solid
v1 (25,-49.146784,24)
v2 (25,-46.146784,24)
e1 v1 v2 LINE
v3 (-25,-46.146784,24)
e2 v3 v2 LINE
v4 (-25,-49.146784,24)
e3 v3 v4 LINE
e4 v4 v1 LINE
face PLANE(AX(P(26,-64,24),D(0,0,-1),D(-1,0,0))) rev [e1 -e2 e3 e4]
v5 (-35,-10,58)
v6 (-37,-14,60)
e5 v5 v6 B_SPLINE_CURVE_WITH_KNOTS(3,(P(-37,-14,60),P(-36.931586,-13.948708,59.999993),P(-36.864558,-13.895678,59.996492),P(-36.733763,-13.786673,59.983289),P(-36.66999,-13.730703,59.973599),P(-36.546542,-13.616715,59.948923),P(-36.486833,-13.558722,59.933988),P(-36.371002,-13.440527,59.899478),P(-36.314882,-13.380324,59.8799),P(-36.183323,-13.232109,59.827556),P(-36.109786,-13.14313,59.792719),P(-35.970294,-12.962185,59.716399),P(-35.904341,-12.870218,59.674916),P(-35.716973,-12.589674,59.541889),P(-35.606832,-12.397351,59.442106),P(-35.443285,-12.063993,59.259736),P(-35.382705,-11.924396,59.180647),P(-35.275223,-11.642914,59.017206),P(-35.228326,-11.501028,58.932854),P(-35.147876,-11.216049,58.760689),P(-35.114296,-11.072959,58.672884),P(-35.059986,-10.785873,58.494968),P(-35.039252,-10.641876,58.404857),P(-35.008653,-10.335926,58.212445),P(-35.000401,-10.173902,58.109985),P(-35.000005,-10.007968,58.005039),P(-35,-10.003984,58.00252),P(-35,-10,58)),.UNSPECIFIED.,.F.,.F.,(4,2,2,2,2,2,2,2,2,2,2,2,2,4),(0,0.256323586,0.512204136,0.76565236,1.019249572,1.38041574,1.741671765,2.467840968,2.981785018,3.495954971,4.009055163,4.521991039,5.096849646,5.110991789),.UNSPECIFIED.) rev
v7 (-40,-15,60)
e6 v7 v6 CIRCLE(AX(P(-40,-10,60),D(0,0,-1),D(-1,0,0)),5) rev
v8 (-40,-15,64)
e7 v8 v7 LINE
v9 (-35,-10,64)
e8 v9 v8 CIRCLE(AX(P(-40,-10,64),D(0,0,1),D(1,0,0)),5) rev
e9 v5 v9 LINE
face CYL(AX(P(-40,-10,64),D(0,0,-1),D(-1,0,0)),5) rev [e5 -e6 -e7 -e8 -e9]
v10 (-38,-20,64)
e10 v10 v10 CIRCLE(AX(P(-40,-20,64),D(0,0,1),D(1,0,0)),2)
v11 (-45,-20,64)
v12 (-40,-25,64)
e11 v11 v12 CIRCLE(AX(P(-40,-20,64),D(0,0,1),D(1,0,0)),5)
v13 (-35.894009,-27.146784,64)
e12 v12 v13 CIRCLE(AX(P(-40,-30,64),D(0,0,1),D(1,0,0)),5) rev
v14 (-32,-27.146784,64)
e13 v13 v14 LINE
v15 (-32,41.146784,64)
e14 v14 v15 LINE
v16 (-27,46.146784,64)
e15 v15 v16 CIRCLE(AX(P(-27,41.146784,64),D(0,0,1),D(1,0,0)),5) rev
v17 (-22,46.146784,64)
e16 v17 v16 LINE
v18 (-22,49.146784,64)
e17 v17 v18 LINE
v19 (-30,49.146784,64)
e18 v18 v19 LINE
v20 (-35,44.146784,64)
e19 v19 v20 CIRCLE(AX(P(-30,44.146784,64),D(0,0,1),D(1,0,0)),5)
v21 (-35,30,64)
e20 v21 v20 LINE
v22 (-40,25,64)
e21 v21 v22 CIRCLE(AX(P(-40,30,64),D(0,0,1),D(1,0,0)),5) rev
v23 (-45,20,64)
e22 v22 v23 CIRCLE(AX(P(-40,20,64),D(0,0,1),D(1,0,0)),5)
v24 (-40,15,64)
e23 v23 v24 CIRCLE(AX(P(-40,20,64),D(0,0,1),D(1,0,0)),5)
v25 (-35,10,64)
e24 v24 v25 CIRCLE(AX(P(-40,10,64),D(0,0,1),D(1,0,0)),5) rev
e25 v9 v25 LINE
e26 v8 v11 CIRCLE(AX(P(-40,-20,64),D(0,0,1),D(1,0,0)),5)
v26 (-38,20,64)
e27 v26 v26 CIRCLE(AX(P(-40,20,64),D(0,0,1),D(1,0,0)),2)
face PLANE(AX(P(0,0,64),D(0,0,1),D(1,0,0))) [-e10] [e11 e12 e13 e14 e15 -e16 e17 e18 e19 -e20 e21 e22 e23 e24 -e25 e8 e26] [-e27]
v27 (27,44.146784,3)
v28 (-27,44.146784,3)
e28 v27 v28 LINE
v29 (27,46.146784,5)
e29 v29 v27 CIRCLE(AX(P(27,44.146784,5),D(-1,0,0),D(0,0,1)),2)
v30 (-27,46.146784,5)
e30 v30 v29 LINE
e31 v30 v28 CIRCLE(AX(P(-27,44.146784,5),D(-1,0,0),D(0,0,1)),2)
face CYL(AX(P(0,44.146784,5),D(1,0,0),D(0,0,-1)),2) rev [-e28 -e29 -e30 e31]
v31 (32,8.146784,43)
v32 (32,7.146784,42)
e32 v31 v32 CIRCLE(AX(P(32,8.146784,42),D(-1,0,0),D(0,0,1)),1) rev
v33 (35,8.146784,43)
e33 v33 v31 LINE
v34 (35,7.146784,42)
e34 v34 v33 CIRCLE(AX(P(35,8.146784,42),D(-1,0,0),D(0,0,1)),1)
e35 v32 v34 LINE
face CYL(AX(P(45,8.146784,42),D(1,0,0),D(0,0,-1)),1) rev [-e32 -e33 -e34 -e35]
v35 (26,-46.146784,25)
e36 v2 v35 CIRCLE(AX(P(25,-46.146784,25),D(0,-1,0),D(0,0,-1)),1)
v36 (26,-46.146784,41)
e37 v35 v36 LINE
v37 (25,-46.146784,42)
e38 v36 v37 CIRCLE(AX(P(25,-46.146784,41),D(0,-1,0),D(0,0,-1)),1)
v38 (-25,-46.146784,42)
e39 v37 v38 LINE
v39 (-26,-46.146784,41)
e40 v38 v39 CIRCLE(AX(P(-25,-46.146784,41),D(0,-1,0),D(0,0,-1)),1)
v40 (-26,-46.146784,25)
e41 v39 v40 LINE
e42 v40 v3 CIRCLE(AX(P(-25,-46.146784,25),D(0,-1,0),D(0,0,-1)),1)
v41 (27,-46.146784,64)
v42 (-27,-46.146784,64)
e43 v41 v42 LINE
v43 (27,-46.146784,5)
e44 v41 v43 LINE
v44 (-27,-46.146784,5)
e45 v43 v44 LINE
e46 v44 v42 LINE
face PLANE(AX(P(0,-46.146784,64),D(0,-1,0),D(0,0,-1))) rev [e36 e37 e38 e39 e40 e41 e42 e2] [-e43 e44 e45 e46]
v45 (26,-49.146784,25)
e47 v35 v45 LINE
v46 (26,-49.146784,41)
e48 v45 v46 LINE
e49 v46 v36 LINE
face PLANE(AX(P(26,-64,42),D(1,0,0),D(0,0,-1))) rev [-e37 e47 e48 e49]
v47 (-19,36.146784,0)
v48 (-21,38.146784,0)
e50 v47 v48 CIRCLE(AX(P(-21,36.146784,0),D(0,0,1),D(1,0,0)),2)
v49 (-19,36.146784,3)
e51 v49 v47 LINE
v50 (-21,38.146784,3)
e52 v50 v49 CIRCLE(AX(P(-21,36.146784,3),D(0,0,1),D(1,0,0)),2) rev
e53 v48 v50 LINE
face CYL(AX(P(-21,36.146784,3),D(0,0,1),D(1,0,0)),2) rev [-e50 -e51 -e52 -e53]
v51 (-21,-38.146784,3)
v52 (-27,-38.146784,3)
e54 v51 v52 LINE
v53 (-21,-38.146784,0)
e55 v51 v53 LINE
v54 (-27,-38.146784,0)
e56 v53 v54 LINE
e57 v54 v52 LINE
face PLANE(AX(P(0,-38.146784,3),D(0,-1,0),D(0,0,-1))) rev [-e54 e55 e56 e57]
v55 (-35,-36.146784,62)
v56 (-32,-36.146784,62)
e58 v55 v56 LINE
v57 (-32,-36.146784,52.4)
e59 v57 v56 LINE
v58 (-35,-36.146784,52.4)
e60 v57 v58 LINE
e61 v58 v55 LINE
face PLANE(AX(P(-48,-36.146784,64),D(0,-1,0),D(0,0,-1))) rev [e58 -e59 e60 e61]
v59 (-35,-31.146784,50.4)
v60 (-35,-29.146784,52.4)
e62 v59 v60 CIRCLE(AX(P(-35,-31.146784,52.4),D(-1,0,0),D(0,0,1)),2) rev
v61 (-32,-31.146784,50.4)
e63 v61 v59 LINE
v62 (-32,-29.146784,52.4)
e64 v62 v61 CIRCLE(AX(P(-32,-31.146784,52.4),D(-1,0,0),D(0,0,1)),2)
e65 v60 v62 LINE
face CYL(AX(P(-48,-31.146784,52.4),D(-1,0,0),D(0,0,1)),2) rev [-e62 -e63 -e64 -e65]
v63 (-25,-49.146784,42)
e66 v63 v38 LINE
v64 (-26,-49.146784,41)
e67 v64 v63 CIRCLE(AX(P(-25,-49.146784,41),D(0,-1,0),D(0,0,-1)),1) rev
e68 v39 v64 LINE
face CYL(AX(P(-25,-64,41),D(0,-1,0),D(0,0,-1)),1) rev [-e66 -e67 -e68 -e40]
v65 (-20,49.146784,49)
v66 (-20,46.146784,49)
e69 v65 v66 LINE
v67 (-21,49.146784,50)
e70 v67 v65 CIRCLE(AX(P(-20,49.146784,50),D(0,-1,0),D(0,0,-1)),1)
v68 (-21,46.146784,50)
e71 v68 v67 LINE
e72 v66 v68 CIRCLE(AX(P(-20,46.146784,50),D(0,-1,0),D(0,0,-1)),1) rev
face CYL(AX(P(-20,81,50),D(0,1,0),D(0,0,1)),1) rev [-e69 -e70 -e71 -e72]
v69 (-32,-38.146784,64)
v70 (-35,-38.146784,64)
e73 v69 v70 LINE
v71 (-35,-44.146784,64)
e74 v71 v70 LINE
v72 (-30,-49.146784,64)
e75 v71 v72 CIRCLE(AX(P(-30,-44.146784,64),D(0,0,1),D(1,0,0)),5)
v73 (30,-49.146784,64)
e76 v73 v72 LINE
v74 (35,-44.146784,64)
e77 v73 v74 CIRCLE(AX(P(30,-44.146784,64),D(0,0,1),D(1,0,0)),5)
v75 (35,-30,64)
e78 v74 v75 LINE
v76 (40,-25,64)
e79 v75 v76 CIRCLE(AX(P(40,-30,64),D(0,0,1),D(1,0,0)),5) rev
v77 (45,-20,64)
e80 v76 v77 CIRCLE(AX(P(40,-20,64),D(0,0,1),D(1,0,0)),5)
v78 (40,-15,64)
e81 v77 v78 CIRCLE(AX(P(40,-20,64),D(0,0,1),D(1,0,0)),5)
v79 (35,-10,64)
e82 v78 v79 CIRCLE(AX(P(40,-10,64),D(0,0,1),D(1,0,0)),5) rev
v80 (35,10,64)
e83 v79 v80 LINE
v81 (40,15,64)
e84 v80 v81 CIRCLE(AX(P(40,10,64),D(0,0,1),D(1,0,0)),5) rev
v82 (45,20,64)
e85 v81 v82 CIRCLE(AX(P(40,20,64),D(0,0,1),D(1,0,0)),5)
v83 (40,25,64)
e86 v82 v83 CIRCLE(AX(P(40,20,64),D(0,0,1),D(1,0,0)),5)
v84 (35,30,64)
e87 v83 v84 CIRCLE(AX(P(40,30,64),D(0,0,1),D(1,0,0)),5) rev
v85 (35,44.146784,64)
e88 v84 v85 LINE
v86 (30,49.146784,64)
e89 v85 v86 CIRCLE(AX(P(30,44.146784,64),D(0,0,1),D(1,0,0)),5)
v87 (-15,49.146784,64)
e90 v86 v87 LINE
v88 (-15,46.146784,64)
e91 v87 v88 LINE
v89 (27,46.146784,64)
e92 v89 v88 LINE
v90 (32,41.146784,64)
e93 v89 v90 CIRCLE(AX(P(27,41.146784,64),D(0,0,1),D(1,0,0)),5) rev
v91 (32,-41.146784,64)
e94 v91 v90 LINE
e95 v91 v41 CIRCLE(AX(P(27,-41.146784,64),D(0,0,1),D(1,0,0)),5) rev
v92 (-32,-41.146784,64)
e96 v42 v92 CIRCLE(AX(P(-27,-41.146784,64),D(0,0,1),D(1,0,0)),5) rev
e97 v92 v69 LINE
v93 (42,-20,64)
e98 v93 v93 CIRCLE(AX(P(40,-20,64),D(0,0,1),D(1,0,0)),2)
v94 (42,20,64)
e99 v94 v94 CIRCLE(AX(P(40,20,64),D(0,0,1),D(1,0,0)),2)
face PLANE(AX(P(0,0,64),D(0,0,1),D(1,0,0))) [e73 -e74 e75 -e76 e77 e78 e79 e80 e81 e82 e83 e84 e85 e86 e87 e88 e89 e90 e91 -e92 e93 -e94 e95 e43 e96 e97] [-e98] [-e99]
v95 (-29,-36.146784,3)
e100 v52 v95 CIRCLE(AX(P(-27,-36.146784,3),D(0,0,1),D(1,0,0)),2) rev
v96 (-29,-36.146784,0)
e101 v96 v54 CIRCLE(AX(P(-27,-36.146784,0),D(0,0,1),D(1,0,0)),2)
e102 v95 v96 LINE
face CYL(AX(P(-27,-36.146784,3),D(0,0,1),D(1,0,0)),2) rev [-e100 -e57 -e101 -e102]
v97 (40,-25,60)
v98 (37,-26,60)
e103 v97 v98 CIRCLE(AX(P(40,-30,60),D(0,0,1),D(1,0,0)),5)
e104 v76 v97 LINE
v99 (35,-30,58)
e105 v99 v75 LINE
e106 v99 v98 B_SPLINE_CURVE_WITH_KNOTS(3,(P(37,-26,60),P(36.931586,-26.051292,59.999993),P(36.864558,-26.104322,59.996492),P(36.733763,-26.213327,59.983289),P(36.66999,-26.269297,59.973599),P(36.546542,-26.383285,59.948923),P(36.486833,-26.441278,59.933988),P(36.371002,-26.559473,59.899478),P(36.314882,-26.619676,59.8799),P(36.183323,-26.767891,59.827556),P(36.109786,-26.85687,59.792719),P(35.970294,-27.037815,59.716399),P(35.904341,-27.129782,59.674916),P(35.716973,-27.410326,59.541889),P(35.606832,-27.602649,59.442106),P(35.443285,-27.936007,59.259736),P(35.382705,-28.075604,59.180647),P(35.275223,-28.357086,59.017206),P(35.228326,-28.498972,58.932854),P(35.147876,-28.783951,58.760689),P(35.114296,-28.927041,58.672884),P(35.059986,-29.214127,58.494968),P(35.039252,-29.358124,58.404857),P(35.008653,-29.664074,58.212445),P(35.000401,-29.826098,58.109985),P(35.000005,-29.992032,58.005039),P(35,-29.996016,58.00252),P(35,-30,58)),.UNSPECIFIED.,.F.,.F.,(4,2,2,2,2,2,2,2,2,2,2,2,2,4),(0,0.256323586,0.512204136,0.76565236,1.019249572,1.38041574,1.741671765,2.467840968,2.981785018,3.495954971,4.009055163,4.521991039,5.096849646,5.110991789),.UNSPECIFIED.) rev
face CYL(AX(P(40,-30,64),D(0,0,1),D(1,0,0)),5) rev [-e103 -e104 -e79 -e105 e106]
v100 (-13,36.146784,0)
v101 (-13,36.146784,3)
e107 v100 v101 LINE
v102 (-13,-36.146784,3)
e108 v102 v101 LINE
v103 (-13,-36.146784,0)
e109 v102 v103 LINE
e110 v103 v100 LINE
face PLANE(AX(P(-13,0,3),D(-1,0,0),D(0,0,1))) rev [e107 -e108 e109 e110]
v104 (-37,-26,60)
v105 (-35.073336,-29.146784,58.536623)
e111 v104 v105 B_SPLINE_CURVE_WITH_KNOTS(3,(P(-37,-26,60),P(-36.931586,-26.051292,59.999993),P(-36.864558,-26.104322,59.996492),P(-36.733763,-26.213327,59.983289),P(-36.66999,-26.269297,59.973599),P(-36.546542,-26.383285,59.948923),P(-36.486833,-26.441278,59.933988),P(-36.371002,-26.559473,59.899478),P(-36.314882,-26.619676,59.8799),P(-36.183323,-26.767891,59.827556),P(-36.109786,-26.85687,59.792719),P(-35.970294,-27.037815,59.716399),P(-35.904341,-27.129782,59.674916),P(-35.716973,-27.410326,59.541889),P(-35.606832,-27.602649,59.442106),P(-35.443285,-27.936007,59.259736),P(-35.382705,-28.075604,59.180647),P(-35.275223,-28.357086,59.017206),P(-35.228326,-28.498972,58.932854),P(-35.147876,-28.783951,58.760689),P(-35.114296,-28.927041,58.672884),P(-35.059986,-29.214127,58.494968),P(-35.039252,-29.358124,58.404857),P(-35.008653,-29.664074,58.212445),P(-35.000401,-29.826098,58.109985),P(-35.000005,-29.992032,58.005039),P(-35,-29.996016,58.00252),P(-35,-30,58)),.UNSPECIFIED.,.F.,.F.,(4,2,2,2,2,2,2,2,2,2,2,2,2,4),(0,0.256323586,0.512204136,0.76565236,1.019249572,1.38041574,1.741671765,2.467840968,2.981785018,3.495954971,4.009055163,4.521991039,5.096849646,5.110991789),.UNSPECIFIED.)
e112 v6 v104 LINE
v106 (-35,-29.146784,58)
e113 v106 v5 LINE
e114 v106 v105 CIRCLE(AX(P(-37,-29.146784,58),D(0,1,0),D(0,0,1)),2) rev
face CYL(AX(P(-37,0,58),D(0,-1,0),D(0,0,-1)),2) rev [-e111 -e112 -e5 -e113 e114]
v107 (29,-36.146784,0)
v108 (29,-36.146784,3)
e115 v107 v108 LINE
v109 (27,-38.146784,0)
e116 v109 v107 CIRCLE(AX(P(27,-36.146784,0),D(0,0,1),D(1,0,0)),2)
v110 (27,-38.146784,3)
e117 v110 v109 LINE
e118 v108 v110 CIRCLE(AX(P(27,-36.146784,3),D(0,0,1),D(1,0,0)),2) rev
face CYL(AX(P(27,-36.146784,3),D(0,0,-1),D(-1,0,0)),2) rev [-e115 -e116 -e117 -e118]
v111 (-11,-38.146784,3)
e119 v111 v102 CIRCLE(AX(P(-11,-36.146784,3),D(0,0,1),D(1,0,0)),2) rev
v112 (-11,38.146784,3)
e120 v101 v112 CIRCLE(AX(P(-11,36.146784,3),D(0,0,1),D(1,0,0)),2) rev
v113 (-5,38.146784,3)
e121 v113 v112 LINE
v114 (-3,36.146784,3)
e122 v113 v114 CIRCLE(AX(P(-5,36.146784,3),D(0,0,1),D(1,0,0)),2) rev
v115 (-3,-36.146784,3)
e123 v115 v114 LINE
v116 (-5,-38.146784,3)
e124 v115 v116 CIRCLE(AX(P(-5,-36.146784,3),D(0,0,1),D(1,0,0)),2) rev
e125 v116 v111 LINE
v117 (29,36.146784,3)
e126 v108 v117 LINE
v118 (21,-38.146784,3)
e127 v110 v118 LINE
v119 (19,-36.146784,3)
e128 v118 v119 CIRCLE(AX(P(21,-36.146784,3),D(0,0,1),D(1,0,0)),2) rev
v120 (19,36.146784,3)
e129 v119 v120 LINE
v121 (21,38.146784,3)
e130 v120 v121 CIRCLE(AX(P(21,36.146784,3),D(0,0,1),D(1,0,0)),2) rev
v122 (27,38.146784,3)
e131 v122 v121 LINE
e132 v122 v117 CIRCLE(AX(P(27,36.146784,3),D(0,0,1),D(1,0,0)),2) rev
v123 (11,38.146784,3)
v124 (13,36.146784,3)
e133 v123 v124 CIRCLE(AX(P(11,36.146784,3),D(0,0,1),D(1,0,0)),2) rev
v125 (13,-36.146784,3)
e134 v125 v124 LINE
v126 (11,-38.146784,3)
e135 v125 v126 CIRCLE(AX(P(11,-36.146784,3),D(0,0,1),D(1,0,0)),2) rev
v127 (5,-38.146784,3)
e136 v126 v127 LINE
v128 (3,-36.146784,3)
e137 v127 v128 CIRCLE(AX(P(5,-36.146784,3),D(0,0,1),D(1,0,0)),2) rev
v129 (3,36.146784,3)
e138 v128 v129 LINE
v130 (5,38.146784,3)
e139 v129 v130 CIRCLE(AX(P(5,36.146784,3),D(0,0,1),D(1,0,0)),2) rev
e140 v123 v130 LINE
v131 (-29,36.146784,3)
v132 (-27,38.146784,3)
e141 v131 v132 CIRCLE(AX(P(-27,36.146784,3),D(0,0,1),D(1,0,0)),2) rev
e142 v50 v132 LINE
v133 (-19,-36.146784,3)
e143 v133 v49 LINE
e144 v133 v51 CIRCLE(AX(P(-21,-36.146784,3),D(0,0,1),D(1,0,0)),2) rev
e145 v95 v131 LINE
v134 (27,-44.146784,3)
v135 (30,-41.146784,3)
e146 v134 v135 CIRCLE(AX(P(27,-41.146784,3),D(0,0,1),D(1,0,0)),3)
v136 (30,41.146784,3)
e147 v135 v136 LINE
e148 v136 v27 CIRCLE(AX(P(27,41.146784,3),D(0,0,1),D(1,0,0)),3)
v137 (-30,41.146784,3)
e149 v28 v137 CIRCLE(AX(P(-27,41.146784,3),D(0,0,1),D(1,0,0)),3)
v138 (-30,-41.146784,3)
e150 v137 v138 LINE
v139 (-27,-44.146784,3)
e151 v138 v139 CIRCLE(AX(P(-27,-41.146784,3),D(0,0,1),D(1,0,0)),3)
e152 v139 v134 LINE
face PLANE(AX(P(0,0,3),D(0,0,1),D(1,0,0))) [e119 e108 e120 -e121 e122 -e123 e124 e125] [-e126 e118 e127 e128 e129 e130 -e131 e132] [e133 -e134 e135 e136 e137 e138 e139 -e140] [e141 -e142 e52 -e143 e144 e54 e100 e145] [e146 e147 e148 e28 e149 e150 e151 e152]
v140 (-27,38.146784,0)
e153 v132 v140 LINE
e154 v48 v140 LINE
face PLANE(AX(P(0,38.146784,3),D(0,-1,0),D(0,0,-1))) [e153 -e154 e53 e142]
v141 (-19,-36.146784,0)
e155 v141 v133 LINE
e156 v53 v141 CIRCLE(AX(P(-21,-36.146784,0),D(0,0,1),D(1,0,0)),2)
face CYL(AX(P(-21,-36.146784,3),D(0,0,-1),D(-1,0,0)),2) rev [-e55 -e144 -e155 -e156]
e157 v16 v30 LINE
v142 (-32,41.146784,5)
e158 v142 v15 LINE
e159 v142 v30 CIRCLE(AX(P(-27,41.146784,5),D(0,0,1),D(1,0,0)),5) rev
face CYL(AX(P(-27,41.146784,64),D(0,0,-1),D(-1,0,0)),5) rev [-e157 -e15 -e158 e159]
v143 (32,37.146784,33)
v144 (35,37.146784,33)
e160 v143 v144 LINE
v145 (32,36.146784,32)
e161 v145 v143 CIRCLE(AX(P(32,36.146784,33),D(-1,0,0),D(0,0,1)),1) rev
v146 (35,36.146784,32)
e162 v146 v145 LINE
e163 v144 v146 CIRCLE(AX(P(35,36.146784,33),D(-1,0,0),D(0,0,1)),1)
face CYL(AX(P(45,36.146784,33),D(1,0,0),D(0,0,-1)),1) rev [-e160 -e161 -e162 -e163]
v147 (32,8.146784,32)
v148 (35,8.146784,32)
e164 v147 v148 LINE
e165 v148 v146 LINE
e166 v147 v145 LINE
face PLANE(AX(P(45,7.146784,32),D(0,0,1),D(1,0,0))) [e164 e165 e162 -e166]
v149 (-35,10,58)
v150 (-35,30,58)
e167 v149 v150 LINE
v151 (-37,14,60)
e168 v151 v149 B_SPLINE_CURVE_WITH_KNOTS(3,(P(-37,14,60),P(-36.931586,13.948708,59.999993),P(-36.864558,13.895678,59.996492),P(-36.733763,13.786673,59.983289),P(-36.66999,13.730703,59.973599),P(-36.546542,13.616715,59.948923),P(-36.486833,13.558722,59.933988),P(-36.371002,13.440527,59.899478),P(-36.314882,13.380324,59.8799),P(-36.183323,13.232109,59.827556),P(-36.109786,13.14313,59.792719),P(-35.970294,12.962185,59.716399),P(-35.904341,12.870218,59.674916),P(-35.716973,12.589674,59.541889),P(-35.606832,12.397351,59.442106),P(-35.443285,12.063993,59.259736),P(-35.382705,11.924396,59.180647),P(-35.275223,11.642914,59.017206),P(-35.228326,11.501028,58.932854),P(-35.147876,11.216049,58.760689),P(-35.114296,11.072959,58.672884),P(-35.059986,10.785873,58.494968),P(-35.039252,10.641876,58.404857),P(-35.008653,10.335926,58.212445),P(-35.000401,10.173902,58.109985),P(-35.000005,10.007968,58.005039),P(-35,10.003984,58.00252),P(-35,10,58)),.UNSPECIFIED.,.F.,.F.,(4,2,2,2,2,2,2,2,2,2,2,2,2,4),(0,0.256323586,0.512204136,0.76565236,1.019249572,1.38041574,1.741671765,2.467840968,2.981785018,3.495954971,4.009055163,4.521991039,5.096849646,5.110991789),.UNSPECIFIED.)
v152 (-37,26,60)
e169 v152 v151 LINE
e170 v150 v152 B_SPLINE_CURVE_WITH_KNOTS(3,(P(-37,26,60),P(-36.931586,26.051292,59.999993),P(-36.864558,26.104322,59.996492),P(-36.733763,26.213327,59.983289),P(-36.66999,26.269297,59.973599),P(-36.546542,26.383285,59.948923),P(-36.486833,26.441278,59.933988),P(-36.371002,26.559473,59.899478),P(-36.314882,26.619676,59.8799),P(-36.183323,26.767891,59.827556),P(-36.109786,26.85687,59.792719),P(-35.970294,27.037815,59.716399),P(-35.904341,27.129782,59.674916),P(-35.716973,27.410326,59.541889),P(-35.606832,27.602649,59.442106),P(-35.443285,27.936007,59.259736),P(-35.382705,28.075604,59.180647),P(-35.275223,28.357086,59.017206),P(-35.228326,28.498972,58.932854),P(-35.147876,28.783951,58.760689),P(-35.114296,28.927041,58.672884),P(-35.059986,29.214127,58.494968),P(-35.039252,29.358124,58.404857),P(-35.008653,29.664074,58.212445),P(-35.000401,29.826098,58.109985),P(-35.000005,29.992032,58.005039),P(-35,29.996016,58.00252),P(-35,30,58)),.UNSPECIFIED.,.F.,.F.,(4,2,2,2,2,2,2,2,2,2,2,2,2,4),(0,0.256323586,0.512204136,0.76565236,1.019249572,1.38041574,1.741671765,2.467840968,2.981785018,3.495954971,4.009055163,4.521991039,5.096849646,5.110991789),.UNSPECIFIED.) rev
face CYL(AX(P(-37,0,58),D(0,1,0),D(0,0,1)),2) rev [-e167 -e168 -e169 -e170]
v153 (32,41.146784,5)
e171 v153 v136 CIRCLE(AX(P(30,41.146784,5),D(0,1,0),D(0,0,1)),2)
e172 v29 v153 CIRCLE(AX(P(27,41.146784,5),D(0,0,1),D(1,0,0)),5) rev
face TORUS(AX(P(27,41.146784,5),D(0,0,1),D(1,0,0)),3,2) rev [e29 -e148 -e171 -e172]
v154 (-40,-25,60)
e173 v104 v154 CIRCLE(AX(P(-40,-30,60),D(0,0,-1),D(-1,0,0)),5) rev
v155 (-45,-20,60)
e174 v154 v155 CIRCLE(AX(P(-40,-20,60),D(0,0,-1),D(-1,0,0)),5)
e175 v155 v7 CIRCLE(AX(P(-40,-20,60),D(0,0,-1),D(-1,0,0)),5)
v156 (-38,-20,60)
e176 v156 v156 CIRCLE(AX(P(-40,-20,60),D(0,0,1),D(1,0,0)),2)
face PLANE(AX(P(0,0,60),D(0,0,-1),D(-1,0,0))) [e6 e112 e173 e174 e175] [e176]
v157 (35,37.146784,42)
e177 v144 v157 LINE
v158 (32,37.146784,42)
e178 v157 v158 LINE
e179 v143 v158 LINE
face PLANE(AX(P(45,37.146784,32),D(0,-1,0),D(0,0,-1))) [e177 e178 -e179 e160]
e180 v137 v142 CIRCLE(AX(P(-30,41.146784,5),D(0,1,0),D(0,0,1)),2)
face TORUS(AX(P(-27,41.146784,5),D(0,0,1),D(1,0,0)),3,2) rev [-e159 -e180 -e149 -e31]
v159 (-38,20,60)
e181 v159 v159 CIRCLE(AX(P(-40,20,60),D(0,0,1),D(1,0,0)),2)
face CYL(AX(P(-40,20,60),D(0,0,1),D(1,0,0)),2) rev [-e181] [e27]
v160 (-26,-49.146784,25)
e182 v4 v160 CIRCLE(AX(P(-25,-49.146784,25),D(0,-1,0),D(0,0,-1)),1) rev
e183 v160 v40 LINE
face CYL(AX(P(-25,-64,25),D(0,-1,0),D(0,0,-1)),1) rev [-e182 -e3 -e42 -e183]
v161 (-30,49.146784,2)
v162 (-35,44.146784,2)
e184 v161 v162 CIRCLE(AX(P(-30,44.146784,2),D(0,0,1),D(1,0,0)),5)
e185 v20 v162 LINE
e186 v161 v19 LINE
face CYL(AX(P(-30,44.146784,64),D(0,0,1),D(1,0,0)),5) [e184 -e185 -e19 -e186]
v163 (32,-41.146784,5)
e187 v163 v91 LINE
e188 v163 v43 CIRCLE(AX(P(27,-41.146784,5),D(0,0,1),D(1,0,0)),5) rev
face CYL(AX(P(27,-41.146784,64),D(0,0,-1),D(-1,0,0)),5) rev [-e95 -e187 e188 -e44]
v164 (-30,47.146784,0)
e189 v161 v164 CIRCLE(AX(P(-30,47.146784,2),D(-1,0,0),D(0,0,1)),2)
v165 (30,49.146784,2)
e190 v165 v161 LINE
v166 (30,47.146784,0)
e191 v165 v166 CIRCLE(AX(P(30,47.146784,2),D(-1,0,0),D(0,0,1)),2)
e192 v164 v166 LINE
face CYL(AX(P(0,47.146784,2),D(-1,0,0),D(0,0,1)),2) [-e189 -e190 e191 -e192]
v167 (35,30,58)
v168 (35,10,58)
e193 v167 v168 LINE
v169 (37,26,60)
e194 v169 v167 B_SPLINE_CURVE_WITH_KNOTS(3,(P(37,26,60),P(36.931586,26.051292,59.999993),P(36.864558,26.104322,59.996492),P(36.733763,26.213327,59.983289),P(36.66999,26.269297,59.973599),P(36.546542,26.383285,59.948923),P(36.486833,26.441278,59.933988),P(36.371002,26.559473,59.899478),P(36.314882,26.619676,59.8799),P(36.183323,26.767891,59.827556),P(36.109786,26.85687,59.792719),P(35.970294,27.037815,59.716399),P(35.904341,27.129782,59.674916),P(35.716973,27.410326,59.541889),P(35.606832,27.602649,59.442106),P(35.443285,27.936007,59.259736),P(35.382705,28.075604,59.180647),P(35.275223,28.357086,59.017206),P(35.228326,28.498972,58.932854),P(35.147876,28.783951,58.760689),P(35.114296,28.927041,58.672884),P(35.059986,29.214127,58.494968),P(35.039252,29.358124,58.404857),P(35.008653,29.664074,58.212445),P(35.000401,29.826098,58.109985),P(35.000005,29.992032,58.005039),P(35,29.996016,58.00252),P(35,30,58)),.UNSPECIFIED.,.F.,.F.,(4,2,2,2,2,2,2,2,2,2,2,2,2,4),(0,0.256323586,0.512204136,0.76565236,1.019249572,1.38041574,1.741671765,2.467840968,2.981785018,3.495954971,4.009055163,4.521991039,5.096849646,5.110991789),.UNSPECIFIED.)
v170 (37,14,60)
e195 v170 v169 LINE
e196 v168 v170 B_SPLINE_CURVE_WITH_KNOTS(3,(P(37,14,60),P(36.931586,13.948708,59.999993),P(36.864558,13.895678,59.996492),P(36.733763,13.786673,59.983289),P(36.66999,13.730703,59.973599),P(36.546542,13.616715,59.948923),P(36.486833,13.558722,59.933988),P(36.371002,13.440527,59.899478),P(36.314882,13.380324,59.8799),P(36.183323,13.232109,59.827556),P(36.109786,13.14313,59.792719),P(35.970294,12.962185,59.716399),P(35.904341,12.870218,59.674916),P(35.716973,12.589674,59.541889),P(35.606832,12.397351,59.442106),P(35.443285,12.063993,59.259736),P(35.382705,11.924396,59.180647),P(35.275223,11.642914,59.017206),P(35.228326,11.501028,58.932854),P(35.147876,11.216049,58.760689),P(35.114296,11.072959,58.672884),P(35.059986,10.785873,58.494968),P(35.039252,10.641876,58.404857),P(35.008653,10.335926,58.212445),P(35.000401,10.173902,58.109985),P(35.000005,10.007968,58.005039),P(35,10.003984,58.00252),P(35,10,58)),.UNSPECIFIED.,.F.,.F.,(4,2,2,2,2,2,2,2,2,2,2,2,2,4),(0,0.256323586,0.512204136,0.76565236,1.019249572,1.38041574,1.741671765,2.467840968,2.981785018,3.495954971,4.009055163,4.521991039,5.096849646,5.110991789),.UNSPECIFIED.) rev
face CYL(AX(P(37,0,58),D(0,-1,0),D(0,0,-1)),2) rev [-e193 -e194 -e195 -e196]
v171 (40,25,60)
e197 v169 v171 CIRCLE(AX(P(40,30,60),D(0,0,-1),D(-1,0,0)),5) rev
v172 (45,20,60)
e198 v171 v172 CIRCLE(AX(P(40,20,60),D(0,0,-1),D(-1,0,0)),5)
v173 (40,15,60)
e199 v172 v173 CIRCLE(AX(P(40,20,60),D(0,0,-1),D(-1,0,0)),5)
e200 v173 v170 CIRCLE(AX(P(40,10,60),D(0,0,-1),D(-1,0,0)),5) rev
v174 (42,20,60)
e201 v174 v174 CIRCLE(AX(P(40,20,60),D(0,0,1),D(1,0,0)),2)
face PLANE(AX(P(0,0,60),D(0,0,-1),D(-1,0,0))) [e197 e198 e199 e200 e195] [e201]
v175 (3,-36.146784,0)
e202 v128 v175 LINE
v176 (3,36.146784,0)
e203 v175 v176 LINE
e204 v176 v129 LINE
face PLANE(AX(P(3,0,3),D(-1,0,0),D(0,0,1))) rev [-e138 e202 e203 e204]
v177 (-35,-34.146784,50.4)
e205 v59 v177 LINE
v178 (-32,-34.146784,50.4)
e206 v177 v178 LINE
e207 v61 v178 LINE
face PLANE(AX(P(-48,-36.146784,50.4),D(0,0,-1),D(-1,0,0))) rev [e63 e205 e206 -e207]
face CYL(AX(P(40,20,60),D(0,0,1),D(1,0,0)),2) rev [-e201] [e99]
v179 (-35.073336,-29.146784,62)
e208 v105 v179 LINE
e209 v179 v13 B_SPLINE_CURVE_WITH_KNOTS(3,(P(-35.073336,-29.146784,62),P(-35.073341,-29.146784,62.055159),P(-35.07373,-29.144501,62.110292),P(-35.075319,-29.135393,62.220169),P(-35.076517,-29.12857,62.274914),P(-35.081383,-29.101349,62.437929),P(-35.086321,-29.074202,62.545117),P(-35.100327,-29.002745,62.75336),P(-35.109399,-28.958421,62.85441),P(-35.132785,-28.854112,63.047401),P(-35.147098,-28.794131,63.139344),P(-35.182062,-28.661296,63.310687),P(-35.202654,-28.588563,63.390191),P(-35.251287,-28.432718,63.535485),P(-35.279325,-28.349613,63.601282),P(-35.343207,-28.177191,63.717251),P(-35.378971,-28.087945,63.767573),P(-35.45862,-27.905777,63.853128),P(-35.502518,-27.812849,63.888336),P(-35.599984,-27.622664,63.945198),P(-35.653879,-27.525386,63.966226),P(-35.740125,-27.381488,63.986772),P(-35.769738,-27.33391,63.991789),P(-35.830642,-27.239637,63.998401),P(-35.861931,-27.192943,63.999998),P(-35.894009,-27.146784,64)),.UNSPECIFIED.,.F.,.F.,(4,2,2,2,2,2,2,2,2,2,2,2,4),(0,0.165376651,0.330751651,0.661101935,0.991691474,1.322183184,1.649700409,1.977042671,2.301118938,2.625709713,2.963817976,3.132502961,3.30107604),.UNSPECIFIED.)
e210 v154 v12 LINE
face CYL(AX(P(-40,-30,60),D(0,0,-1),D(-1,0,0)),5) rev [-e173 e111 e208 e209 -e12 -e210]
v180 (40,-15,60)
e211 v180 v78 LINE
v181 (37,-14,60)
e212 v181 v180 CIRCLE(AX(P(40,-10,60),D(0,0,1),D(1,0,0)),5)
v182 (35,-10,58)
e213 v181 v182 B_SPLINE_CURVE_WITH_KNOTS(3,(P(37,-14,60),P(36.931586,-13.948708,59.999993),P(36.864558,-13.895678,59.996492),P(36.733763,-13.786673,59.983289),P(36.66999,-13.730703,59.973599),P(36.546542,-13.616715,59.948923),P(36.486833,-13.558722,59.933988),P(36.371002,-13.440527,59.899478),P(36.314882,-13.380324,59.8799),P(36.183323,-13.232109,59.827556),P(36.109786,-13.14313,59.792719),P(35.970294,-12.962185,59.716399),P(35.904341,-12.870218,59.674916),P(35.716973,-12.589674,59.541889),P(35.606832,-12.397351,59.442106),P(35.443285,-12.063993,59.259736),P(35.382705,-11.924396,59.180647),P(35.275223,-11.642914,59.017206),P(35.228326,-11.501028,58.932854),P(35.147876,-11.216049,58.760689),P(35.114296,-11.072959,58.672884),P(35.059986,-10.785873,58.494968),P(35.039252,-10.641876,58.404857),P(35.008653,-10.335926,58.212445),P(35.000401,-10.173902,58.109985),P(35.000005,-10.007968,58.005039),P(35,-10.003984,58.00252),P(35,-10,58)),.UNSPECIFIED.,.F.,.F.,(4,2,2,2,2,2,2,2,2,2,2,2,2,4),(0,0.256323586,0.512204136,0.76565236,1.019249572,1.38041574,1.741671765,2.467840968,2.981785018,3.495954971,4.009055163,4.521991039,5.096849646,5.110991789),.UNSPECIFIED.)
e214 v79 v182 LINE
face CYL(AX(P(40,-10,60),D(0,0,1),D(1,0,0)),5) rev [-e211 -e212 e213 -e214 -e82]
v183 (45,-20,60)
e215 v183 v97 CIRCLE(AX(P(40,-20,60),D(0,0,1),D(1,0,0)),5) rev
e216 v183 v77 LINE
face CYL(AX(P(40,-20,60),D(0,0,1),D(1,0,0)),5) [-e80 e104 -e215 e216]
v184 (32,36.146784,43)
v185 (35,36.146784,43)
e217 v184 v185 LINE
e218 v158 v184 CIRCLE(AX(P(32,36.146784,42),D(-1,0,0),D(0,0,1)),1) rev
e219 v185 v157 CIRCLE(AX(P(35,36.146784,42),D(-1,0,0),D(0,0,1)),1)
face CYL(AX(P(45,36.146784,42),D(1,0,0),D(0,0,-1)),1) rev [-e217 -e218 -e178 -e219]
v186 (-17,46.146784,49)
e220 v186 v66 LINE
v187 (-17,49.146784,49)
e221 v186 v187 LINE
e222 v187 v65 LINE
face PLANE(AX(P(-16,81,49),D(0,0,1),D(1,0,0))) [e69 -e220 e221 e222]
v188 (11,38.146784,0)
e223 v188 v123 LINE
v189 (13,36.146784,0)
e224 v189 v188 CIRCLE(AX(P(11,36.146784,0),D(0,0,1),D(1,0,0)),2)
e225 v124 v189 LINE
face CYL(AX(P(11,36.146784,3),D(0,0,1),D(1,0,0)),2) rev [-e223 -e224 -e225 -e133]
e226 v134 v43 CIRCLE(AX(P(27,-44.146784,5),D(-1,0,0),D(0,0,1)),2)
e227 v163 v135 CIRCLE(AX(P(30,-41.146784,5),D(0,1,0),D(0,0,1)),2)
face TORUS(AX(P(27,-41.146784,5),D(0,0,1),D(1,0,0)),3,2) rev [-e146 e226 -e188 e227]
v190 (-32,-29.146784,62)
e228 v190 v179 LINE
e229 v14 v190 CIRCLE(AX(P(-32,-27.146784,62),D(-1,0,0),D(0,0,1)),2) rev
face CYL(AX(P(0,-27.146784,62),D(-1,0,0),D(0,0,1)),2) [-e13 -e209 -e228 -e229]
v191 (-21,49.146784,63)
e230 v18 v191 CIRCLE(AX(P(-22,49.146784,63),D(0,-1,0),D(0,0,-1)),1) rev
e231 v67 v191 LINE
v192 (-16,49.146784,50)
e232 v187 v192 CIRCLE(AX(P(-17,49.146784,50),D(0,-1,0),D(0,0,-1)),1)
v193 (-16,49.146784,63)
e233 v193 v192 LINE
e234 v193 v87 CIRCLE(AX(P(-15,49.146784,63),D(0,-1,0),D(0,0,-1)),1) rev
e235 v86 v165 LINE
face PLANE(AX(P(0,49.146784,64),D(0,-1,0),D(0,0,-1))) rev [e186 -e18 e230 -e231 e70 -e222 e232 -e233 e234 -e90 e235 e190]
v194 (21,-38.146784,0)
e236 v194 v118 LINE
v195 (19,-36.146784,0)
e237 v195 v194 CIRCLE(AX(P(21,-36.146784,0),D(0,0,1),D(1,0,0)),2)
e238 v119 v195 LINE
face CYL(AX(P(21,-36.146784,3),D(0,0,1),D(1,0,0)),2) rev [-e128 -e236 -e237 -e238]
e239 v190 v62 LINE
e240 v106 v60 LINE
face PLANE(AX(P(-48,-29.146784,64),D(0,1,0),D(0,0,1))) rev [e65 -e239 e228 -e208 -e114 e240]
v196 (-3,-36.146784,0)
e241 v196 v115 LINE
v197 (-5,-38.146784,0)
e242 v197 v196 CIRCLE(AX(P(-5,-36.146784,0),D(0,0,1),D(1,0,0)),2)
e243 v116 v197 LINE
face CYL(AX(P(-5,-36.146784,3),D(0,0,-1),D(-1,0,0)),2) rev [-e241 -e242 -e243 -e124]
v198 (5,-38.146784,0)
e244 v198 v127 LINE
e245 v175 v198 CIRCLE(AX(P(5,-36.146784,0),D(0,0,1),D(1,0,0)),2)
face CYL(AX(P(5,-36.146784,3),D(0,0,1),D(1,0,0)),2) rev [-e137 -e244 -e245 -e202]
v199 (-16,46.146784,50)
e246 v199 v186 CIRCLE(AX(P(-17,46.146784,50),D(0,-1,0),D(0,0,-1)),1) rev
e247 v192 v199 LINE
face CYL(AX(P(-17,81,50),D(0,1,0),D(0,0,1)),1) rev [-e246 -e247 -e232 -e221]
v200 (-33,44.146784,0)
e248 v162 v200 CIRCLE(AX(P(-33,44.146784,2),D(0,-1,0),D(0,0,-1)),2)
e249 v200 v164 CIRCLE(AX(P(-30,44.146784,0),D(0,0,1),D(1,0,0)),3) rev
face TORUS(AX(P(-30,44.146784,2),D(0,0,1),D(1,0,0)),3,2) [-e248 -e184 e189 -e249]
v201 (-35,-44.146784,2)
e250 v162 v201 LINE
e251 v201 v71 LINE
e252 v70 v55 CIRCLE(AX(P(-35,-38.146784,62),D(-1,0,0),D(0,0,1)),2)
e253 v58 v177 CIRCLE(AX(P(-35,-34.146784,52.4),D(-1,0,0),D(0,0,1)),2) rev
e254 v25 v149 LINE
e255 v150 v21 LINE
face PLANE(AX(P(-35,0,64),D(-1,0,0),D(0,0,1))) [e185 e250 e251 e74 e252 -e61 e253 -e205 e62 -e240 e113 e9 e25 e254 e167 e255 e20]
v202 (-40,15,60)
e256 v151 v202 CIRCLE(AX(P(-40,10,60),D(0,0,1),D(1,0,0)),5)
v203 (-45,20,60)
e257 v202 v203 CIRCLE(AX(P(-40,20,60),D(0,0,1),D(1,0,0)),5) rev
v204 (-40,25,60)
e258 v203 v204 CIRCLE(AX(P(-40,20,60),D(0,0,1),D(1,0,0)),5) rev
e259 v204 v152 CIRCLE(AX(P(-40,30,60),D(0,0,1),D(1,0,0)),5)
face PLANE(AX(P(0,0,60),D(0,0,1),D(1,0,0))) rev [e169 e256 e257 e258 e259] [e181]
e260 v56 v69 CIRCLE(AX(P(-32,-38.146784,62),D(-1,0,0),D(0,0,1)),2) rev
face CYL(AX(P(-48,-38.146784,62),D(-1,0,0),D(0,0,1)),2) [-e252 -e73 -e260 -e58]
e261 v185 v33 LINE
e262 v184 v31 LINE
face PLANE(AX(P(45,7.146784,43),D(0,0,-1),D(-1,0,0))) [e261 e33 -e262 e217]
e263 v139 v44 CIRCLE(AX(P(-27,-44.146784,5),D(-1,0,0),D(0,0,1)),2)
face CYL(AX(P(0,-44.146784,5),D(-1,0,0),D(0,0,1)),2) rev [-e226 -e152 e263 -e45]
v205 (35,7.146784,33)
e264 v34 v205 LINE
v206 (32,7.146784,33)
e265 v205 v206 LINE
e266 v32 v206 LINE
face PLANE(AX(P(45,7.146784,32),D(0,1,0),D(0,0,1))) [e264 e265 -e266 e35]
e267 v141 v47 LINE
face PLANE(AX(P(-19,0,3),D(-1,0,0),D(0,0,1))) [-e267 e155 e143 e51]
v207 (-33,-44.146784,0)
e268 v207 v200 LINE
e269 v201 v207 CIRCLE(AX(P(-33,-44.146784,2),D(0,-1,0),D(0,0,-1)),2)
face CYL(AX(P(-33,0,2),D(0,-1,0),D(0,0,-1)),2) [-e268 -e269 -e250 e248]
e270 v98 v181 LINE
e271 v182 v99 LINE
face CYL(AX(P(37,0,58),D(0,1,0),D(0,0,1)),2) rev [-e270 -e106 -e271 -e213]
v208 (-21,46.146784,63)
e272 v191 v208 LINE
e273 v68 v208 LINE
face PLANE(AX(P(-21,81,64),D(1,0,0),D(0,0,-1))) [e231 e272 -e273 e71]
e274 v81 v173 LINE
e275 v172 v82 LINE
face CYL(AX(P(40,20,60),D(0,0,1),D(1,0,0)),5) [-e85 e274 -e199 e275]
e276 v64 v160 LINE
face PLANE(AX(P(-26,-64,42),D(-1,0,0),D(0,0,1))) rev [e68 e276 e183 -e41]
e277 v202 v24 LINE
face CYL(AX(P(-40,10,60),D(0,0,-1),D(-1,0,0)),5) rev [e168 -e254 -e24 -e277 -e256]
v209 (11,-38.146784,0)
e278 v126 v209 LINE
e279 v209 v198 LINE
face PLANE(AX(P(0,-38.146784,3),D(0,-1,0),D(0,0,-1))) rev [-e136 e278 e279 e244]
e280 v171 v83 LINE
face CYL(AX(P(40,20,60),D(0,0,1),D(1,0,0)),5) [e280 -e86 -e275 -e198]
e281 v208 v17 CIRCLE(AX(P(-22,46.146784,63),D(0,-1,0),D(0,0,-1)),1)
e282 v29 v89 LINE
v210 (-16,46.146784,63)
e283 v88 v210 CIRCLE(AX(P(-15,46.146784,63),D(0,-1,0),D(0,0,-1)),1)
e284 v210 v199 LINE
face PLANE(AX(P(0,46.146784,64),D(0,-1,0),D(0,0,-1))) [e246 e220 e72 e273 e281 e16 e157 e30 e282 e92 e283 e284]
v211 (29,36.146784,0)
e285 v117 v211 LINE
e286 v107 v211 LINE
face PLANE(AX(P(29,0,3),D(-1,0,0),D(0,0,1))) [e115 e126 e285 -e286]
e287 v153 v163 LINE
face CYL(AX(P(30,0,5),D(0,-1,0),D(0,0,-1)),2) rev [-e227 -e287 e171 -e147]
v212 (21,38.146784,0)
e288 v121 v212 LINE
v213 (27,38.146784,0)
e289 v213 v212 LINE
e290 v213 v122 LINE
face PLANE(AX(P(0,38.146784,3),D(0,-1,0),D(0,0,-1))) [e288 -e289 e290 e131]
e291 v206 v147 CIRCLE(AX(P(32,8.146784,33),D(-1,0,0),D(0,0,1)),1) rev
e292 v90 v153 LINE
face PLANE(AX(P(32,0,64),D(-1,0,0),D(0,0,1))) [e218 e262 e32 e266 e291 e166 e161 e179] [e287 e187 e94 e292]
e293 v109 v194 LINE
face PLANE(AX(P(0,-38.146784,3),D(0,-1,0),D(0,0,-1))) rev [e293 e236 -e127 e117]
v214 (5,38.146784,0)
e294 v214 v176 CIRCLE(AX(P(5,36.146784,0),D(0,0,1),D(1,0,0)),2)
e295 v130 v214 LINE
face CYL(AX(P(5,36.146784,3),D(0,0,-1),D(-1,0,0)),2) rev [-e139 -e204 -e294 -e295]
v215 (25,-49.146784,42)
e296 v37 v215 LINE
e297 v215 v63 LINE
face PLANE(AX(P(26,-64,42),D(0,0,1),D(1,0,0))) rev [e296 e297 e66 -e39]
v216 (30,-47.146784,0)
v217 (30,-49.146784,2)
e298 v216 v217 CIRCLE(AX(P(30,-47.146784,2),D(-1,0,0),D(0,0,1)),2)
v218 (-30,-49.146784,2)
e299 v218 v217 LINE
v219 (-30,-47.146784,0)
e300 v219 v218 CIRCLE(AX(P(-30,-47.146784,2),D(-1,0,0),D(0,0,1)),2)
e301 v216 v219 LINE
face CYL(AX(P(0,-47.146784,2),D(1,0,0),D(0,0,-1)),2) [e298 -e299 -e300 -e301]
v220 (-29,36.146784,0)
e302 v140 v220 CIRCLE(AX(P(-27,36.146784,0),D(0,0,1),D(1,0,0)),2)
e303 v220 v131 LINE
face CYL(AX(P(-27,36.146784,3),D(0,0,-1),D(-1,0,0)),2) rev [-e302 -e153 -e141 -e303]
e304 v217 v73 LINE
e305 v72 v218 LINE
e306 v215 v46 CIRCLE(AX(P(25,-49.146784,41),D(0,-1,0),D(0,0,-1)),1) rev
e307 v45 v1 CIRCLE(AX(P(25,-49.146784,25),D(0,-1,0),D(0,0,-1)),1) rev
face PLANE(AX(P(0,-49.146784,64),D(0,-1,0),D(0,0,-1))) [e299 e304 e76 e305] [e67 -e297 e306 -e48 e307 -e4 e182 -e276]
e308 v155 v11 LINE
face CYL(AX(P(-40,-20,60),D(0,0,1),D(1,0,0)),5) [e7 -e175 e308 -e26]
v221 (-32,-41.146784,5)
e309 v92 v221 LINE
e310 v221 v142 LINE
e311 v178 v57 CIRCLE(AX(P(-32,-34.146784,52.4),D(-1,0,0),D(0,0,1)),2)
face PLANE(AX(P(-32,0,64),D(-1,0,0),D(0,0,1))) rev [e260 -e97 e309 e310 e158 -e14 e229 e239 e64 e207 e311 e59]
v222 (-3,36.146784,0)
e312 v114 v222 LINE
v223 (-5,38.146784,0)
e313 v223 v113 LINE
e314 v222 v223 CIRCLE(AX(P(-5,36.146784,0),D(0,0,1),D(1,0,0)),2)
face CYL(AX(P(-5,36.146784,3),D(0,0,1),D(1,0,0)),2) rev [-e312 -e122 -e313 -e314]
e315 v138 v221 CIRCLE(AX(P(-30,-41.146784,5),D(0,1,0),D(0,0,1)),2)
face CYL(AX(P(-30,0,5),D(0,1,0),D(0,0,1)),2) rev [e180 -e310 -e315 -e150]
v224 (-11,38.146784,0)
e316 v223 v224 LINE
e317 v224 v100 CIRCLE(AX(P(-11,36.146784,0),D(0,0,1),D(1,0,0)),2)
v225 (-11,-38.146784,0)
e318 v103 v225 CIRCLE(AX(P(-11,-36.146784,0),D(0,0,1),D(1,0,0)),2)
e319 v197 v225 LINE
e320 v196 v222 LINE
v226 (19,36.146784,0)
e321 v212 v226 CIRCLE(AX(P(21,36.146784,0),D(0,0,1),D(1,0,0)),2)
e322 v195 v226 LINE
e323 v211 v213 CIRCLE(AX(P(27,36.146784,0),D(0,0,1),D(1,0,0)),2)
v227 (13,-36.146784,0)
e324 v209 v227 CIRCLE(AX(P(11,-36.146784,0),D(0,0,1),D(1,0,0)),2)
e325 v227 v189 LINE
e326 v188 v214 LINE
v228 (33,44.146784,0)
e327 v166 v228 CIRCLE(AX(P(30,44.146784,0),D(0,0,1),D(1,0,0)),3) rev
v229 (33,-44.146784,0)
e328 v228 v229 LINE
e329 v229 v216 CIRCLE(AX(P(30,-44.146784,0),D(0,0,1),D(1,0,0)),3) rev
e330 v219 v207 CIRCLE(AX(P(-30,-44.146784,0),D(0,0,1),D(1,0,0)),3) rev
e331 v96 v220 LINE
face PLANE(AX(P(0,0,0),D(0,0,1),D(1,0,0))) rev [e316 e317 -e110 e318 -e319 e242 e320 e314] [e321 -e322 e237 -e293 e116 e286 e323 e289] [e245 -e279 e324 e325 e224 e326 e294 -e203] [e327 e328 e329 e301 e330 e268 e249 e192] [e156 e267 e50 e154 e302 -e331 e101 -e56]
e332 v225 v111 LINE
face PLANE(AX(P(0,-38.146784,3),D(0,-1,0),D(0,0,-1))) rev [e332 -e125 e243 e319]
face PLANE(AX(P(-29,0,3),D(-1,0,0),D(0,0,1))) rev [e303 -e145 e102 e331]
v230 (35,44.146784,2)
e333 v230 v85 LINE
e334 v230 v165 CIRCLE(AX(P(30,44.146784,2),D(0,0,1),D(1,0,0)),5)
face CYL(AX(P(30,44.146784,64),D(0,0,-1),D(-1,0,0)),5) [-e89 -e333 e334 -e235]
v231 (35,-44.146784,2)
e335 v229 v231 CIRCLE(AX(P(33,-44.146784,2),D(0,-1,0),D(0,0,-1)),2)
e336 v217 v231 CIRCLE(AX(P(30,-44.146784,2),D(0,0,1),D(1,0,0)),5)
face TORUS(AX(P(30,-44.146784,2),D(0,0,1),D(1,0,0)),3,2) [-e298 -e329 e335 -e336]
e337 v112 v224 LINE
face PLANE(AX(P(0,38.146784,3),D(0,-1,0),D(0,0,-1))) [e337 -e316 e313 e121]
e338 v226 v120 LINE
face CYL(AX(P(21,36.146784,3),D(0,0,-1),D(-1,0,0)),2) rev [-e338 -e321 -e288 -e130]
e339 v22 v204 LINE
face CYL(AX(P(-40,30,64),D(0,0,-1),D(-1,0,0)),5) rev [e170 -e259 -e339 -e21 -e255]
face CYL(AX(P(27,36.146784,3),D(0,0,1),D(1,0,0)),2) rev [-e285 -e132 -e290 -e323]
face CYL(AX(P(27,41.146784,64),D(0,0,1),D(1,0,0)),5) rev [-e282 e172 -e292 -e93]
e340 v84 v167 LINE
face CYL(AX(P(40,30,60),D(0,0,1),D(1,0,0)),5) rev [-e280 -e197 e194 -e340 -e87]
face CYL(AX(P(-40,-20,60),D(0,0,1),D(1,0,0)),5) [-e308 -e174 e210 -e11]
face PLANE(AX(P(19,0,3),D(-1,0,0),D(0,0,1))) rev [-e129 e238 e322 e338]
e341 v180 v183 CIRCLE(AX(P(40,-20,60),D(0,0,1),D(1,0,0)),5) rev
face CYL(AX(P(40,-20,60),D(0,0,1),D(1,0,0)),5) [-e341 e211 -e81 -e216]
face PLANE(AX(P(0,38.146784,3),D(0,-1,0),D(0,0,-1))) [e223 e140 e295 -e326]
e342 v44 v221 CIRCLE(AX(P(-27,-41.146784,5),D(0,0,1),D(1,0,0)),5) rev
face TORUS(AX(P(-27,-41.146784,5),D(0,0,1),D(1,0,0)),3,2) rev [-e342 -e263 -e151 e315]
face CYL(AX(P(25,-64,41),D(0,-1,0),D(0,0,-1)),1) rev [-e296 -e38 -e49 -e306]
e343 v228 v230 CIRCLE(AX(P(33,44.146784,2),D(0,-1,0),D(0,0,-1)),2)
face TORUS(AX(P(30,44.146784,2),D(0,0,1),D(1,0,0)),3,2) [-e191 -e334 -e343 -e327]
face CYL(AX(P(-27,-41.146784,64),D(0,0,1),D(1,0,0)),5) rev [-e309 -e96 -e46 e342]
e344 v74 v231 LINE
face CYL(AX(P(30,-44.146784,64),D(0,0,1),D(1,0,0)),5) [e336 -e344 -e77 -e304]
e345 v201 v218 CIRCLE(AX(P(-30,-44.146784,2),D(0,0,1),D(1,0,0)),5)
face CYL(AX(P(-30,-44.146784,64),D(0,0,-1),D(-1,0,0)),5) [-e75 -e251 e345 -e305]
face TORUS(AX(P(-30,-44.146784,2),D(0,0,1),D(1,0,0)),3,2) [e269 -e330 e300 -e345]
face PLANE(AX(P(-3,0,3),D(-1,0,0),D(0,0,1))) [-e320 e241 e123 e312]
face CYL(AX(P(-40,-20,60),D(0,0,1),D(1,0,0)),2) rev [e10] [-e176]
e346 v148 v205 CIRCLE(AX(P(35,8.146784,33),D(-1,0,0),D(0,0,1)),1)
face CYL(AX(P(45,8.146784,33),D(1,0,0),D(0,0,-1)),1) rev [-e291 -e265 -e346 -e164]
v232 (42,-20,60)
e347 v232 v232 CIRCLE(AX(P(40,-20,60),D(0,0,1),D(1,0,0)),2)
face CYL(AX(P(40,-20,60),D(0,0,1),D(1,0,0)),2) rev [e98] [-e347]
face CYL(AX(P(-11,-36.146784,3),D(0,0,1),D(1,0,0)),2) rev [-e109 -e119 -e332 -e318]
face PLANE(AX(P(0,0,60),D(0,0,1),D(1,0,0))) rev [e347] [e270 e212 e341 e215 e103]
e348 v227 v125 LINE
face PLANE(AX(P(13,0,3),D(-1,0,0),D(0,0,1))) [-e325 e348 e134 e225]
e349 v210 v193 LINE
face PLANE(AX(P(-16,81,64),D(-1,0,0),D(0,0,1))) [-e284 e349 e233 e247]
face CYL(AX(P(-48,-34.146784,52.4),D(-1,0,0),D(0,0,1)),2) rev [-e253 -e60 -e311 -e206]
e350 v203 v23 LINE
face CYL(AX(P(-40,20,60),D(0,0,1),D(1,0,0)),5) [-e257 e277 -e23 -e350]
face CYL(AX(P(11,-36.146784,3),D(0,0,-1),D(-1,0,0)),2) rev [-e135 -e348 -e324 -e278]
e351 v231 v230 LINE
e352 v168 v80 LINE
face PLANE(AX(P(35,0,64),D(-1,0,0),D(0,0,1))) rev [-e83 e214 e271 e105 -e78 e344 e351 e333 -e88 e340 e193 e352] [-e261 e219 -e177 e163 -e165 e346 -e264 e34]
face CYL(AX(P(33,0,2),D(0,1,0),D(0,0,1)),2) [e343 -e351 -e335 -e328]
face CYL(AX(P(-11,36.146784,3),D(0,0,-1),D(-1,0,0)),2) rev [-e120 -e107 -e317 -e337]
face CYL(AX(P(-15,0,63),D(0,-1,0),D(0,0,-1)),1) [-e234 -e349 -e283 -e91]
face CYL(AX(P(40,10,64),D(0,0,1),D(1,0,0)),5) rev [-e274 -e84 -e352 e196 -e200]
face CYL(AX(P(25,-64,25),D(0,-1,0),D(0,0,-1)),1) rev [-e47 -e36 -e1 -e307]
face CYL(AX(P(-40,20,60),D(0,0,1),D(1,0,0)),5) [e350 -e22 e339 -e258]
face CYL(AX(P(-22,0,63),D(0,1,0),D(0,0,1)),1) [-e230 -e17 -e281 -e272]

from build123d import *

# Parameters (mm, degrees)
SKETCH1_W           = 64
SKETCH1_H           = 92.29356787
SKETCH1_W_2         = 10
SKETCH1_H_2         = 76.29356787
BOSS_EXTRUDE1_DEPTH = 3
SKETCH1_3_W         = 70
SKETCH1_3_H         = 98.29356787
SKETCH1_3_W_2       = 64
SKETCH1_3_H_2       = 92.29356787
BOSS_EXTRUDE2_DEPTH = 64
FILLET1_R           = 2
FILLET2_R           = 5
SKETCH2_W           = 52
SKETCH2_H           = 18
CUT_EXTRUDE1_DEPTH  = 64
FILLET3_R           = 1
SKETCH3_W           = 11
SKETCH3_H           = 30
CUT_EXTRUDE2_DEPTH  = 45
FILLET4_R           = 1
SKETCH4_W           = 5
SKETCH4_H           = 15
CUT_EXTRUDE3_DEPTH  = 81
FILLET5_R           = 1
SKETCH5_W           = 10
SKETCH5_H           = 10
SKETCH5_R           = 2
BOSS_EXTRUDE3_DEPTH = 4
FILLET6_R           = 5
FILLET7_R           = 5
FILLET8_R           = 2
FILLET9_R           = 2
FILLET10_R          = 2
SKETCH6_W           = 13.6
SKETCH6_H           = 7
CUT_EXTRUDE4_DEPTH  = 48
FILLET11_R          = 2


with BuildPart() as part:
    # Sketch1 → Boss-Extrude1 (new body)
    with BuildSketch(Plane.XY):
        Rectangle(SKETCH1_W, SKETCH1_H)
        with Locations((-24, 0)):
            Rectangle(SKETCH1_W_2, SKETCH1_H_2, mode=Mode.SUBTRACT)
        with Locations((-8, 0)):
            Rectangle(SKETCH1_W_2, SKETCH1_H_2, mode=Mode.SUBTRACT)
        with Locations((8, 0)):
            Rectangle(SKETCH1_W_2, SKETCH1_H_2, mode=Mode.SUBTRACT)
        with Locations((24, 0)):
            Rectangle(SKETCH1_W_2, SKETCH1_H_2, mode=Mode.SUBTRACT)
    extrude(amount=BOSS_EXTRUDE1_DEPTH)

    # Sketch1<3> → Boss-Extrude2 (add)
    with BuildSketch(Plane.XY):
        Rectangle(SKETCH1_3_W, SKETCH1_3_H)
        Rectangle(SKETCH1_3_W_2, SKETCH1_3_H_2, mode=Mode.SUBTRACT)
    extrude(amount=BOSS_EXTRUDE2_DEPTH)

    # Fillet1
    fillet1_edges = [part.edges().sort_by_distance(p)[0] for p in [
        (-19, -38.146783935, 1.5),
        (-19, 38.146783935, 1.5),
        (-29, 38.146783935, 1.5),
        (-29, -38.146783935, 1.5),
        (-13, 38.146783935, 1.5),
        (-13, -38.146783935, 1.5),
        (-3, -38.146783935, 1.5),
        (-3, 38.146783935, 1.5),
        (3, 38.146783935, 1.5),
        (3, -38.146783935, 1.5),
        (13, -38.146783935, 1.5),
        (13, 38.146783935, 1.5),
        (19, 38.146783935, 1.5),
        (19, -38.146783935, 1.5),
        (29, -38.146783935, 1.5),
        (29, 38.146783935, 1.5),
    ]]
    fillet(fillet1_edges, radius=FILLET1_R)

    # Fillet2
    fillet2_edges = [part.edges().sort_by_distance(p)[0] for p in [
        (32, -46.146783935, 33.5),
        (-32, -46.146783935, 33.5),
        (-32, 46.146783935, 33.5),
        (-35, 49.146783935, 32),
        (-35, -49.146783935, 32),
        (35, -49.146783935, 32),
        (35, 49.146783935, 32),
        (32, 46.146783935, 33.5),
    ]]
    fillet(fillet2_edges, radius=FILLET2_R)

    # Sketch2 → Cut-Extrude1 (cut)
    with BuildSketch(Plane(origin=(0, 0, 0), x_dir=(1, 0, 0), z_dir=(0, 1, 0))):
        with Locations((0, -33)):
            Rectangle(SKETCH2_W, SKETCH2_H)
    extrude(amount=-CUT_EXTRUDE1_DEPTH, mode=Mode.SUBTRACT)

    # Fillet3
    fillet3_edges = [part.edges().sort_by_distance(p)[0] for p in [
        (-26, -47.646783935, 42),
        (-26, -47.646783935, 24),
        (26, -47.646783935, 24),
        (26, -47.646783935, 42),
    ]]
    fillet(fillet3_edges, radius=FILLET3_R)

    # Sketch3 → Cut-Extrude2 (cut)
    with BuildSketch(Plane(origin=(0, 0, 0), x_dir=(0, 0, -1), z_dir=(1, 0, 0))):
        with Locations((-37.5, 22.146783935)):
            Rectangle(SKETCH3_W, SKETCH3_H)
    extrude(amount=CUT_EXTRUDE2_DEPTH, mode=Mode.SUBTRACT)

    # Fillet4
    fillet4_edges = [part.edges().sort_by_distance(p)[0] for p in [
        (33.5, 37.146783935, 43),
        (33.5, 7.146783935, 43),
        (33.5, 7.146783935, 32),
        (33.5, 37.146783935, 32),
    ]]
    fillet(fillet4_edges, radius=FILLET4_R)

    # Sketch4 → Cut-Extrude3 (cut)
    with BuildSketch(Plane(origin=(0, 0, 0), x_dir=(1, 0, 0), z_dir=(0, 1, 0))):
        with Locations((-18.5, -56.5)):
            Rectangle(SKETCH4_W, SKETCH4_H)
    extrude(amount=CUT_EXTRUDE3_DEPTH, mode=Mode.SUBTRACT)

    # Fillet5
    fillet5_edges = [part.edges().sort_by_distance(p)[0] for p in [
        (-16, 47.646783935, 64),
        (-21, 47.646783935, 64),
        (-16, 47.646783935, 49),
        (-21, 47.646783935, 49),
    ]]
    fillet(fillet5_edges, radius=FILLET5_R)

    # Sketch5 → Boss-Extrude3 (add)
    # profile 1 of 4: a face of its own
    with BuildSketch(Plane.XY.offset(64)):
        with Locations((40, 20)):
            Rectangle(SKETCH5_W, SKETCH5_H)
        with Locations((40, 20)):
            Circle(SKETCH5_R, mode=Mode.SUBTRACT)
    # profile 2 of 4: a face of its own
    with BuildSketch(Plane.XY.offset(64)):
        with Locations((40, -20)):
            Rectangle(SKETCH5_W, SKETCH5_H)
        with Locations((40, -20)):
            Circle(SKETCH5_R, mode=Mode.SUBTRACT)
    # profile 3 of 4: a face of its own
    with BuildSketch(Plane.XY.offset(64)):
        with Locations((-40, -20)):
            Rectangle(SKETCH5_W, SKETCH5_H)
        with Locations((-40, -20)):
            Circle(SKETCH5_R, mode=Mode.SUBTRACT)
    # profile 4 of 4: a face of its own
    with BuildSketch(Plane.XY.offset(64)):
        with Locations((-40, 20)):
            Rectangle(SKETCH5_W, SKETCH5_H)
        with Locations((-40, 20)):
            Circle(SKETCH5_R, mode=Mode.SUBTRACT)
    extrude(amount=-BOSS_EXTRUDE3_DEPTH)

    # Fillet6
    fillet6_edges = [part.edges().sort_by_distance(p)[0] for p in [
        (35, 15, 62),
        (35, 25, 62),
        (35, -25, 62),
        (35, -15, 62),
        (-35, -15, 62),
        (-35, -25, 62),
        (-35, 25, 62),
        (-35, 15, 62),
    ]]
    fillet(fillet6_edges, radius=FILLET6_R)

    # Fillet7
    fillet7_edges = [part.edges().sort_by_distance(p)[0] for p in [
        (-45, 25, 62),
        (-45, 15, 62),
        (-45, -15, 62),
        (-45, -25, 62),
        (45, -25, 62),
        (45, -15, 62),
        (45, 15, 62),
        (45, 25, 62),
    ]]
    fillet(fillet7_edges, radius=FILLET7_R - 0.0001)  # a hair under: the kernel refuses the full size

    # Fillet8
    fillet8_edges = [part.edges().sort_by_distance(p)[0] for p in [
        (35, 20, 60),
        (35, -20, 60),
        (-35, -20, 60),
        (-35, 20, 60),
    ]]
    fillet(fillet8_edges, radius=FILLET8_R)

    # Fillet9
    fillet9_edges = [part.edges().sort_by_distance(p)[0] for p in [
        (35, 0, 0),
        (-35, 0, 0),
        (0, 49.146783935, 0),
        (0, -49.146783935, 0),
        (-33.535533906, 47.68231784, 0),
        (33.535533906, 47.68231784, 0),
        (-33.535533906, -47.68231784, 0),
        (33.535533906, -47.68231784, 0),
    ]]
    fillet(fillet9_edges, radius=FILLET9_R)

    # Fillet10
    fillet10_edges = [part.edges().sort_by_distance(p)[0] for p in [
        (-32, 0, 3),
        (0, -46.146783935, 3),
        (32, 0, 3),
        (0, 46.146783935, 3),
        (30.535533906, 44.68231784, 3),
        (-30.535533906, 44.68231784, 3),
        (30.535533906, -44.68231784, 3),
        (-30.535533906, -44.68231784, 3),
    ]]
    fillet(fillet10_edges, radius=FILLET10_R)

    # Sketch6 → Cut-Extrude4 (cut)
    with BuildSketch(Plane(origin=(0, 0, 0), x_dir=(0, 0, -1), z_dir=(1, 0, 0))):
        with Locations((-57.2, -32.646783935)):
            Rectangle(SKETCH6_W, SKETCH6_H)
    extrude(amount=-CUT_EXTRUDE4_DEPTH, mode=Mode.SUBTRACT)

    # Fillet11
    fillet11_edges = [part.edges().sort_by_distance(p)[0] for p in [
        (-33.5, -29.146783935, 50.4),
        (-33.5, -36.146783935, 50.4),
        (-33.5, -36.146783935, 64),
        (-33.536667788, -29.146783935, 64),
    ]]
    fillet(fillet11_edges, radius=FILLET11_R)


solid = part.part
